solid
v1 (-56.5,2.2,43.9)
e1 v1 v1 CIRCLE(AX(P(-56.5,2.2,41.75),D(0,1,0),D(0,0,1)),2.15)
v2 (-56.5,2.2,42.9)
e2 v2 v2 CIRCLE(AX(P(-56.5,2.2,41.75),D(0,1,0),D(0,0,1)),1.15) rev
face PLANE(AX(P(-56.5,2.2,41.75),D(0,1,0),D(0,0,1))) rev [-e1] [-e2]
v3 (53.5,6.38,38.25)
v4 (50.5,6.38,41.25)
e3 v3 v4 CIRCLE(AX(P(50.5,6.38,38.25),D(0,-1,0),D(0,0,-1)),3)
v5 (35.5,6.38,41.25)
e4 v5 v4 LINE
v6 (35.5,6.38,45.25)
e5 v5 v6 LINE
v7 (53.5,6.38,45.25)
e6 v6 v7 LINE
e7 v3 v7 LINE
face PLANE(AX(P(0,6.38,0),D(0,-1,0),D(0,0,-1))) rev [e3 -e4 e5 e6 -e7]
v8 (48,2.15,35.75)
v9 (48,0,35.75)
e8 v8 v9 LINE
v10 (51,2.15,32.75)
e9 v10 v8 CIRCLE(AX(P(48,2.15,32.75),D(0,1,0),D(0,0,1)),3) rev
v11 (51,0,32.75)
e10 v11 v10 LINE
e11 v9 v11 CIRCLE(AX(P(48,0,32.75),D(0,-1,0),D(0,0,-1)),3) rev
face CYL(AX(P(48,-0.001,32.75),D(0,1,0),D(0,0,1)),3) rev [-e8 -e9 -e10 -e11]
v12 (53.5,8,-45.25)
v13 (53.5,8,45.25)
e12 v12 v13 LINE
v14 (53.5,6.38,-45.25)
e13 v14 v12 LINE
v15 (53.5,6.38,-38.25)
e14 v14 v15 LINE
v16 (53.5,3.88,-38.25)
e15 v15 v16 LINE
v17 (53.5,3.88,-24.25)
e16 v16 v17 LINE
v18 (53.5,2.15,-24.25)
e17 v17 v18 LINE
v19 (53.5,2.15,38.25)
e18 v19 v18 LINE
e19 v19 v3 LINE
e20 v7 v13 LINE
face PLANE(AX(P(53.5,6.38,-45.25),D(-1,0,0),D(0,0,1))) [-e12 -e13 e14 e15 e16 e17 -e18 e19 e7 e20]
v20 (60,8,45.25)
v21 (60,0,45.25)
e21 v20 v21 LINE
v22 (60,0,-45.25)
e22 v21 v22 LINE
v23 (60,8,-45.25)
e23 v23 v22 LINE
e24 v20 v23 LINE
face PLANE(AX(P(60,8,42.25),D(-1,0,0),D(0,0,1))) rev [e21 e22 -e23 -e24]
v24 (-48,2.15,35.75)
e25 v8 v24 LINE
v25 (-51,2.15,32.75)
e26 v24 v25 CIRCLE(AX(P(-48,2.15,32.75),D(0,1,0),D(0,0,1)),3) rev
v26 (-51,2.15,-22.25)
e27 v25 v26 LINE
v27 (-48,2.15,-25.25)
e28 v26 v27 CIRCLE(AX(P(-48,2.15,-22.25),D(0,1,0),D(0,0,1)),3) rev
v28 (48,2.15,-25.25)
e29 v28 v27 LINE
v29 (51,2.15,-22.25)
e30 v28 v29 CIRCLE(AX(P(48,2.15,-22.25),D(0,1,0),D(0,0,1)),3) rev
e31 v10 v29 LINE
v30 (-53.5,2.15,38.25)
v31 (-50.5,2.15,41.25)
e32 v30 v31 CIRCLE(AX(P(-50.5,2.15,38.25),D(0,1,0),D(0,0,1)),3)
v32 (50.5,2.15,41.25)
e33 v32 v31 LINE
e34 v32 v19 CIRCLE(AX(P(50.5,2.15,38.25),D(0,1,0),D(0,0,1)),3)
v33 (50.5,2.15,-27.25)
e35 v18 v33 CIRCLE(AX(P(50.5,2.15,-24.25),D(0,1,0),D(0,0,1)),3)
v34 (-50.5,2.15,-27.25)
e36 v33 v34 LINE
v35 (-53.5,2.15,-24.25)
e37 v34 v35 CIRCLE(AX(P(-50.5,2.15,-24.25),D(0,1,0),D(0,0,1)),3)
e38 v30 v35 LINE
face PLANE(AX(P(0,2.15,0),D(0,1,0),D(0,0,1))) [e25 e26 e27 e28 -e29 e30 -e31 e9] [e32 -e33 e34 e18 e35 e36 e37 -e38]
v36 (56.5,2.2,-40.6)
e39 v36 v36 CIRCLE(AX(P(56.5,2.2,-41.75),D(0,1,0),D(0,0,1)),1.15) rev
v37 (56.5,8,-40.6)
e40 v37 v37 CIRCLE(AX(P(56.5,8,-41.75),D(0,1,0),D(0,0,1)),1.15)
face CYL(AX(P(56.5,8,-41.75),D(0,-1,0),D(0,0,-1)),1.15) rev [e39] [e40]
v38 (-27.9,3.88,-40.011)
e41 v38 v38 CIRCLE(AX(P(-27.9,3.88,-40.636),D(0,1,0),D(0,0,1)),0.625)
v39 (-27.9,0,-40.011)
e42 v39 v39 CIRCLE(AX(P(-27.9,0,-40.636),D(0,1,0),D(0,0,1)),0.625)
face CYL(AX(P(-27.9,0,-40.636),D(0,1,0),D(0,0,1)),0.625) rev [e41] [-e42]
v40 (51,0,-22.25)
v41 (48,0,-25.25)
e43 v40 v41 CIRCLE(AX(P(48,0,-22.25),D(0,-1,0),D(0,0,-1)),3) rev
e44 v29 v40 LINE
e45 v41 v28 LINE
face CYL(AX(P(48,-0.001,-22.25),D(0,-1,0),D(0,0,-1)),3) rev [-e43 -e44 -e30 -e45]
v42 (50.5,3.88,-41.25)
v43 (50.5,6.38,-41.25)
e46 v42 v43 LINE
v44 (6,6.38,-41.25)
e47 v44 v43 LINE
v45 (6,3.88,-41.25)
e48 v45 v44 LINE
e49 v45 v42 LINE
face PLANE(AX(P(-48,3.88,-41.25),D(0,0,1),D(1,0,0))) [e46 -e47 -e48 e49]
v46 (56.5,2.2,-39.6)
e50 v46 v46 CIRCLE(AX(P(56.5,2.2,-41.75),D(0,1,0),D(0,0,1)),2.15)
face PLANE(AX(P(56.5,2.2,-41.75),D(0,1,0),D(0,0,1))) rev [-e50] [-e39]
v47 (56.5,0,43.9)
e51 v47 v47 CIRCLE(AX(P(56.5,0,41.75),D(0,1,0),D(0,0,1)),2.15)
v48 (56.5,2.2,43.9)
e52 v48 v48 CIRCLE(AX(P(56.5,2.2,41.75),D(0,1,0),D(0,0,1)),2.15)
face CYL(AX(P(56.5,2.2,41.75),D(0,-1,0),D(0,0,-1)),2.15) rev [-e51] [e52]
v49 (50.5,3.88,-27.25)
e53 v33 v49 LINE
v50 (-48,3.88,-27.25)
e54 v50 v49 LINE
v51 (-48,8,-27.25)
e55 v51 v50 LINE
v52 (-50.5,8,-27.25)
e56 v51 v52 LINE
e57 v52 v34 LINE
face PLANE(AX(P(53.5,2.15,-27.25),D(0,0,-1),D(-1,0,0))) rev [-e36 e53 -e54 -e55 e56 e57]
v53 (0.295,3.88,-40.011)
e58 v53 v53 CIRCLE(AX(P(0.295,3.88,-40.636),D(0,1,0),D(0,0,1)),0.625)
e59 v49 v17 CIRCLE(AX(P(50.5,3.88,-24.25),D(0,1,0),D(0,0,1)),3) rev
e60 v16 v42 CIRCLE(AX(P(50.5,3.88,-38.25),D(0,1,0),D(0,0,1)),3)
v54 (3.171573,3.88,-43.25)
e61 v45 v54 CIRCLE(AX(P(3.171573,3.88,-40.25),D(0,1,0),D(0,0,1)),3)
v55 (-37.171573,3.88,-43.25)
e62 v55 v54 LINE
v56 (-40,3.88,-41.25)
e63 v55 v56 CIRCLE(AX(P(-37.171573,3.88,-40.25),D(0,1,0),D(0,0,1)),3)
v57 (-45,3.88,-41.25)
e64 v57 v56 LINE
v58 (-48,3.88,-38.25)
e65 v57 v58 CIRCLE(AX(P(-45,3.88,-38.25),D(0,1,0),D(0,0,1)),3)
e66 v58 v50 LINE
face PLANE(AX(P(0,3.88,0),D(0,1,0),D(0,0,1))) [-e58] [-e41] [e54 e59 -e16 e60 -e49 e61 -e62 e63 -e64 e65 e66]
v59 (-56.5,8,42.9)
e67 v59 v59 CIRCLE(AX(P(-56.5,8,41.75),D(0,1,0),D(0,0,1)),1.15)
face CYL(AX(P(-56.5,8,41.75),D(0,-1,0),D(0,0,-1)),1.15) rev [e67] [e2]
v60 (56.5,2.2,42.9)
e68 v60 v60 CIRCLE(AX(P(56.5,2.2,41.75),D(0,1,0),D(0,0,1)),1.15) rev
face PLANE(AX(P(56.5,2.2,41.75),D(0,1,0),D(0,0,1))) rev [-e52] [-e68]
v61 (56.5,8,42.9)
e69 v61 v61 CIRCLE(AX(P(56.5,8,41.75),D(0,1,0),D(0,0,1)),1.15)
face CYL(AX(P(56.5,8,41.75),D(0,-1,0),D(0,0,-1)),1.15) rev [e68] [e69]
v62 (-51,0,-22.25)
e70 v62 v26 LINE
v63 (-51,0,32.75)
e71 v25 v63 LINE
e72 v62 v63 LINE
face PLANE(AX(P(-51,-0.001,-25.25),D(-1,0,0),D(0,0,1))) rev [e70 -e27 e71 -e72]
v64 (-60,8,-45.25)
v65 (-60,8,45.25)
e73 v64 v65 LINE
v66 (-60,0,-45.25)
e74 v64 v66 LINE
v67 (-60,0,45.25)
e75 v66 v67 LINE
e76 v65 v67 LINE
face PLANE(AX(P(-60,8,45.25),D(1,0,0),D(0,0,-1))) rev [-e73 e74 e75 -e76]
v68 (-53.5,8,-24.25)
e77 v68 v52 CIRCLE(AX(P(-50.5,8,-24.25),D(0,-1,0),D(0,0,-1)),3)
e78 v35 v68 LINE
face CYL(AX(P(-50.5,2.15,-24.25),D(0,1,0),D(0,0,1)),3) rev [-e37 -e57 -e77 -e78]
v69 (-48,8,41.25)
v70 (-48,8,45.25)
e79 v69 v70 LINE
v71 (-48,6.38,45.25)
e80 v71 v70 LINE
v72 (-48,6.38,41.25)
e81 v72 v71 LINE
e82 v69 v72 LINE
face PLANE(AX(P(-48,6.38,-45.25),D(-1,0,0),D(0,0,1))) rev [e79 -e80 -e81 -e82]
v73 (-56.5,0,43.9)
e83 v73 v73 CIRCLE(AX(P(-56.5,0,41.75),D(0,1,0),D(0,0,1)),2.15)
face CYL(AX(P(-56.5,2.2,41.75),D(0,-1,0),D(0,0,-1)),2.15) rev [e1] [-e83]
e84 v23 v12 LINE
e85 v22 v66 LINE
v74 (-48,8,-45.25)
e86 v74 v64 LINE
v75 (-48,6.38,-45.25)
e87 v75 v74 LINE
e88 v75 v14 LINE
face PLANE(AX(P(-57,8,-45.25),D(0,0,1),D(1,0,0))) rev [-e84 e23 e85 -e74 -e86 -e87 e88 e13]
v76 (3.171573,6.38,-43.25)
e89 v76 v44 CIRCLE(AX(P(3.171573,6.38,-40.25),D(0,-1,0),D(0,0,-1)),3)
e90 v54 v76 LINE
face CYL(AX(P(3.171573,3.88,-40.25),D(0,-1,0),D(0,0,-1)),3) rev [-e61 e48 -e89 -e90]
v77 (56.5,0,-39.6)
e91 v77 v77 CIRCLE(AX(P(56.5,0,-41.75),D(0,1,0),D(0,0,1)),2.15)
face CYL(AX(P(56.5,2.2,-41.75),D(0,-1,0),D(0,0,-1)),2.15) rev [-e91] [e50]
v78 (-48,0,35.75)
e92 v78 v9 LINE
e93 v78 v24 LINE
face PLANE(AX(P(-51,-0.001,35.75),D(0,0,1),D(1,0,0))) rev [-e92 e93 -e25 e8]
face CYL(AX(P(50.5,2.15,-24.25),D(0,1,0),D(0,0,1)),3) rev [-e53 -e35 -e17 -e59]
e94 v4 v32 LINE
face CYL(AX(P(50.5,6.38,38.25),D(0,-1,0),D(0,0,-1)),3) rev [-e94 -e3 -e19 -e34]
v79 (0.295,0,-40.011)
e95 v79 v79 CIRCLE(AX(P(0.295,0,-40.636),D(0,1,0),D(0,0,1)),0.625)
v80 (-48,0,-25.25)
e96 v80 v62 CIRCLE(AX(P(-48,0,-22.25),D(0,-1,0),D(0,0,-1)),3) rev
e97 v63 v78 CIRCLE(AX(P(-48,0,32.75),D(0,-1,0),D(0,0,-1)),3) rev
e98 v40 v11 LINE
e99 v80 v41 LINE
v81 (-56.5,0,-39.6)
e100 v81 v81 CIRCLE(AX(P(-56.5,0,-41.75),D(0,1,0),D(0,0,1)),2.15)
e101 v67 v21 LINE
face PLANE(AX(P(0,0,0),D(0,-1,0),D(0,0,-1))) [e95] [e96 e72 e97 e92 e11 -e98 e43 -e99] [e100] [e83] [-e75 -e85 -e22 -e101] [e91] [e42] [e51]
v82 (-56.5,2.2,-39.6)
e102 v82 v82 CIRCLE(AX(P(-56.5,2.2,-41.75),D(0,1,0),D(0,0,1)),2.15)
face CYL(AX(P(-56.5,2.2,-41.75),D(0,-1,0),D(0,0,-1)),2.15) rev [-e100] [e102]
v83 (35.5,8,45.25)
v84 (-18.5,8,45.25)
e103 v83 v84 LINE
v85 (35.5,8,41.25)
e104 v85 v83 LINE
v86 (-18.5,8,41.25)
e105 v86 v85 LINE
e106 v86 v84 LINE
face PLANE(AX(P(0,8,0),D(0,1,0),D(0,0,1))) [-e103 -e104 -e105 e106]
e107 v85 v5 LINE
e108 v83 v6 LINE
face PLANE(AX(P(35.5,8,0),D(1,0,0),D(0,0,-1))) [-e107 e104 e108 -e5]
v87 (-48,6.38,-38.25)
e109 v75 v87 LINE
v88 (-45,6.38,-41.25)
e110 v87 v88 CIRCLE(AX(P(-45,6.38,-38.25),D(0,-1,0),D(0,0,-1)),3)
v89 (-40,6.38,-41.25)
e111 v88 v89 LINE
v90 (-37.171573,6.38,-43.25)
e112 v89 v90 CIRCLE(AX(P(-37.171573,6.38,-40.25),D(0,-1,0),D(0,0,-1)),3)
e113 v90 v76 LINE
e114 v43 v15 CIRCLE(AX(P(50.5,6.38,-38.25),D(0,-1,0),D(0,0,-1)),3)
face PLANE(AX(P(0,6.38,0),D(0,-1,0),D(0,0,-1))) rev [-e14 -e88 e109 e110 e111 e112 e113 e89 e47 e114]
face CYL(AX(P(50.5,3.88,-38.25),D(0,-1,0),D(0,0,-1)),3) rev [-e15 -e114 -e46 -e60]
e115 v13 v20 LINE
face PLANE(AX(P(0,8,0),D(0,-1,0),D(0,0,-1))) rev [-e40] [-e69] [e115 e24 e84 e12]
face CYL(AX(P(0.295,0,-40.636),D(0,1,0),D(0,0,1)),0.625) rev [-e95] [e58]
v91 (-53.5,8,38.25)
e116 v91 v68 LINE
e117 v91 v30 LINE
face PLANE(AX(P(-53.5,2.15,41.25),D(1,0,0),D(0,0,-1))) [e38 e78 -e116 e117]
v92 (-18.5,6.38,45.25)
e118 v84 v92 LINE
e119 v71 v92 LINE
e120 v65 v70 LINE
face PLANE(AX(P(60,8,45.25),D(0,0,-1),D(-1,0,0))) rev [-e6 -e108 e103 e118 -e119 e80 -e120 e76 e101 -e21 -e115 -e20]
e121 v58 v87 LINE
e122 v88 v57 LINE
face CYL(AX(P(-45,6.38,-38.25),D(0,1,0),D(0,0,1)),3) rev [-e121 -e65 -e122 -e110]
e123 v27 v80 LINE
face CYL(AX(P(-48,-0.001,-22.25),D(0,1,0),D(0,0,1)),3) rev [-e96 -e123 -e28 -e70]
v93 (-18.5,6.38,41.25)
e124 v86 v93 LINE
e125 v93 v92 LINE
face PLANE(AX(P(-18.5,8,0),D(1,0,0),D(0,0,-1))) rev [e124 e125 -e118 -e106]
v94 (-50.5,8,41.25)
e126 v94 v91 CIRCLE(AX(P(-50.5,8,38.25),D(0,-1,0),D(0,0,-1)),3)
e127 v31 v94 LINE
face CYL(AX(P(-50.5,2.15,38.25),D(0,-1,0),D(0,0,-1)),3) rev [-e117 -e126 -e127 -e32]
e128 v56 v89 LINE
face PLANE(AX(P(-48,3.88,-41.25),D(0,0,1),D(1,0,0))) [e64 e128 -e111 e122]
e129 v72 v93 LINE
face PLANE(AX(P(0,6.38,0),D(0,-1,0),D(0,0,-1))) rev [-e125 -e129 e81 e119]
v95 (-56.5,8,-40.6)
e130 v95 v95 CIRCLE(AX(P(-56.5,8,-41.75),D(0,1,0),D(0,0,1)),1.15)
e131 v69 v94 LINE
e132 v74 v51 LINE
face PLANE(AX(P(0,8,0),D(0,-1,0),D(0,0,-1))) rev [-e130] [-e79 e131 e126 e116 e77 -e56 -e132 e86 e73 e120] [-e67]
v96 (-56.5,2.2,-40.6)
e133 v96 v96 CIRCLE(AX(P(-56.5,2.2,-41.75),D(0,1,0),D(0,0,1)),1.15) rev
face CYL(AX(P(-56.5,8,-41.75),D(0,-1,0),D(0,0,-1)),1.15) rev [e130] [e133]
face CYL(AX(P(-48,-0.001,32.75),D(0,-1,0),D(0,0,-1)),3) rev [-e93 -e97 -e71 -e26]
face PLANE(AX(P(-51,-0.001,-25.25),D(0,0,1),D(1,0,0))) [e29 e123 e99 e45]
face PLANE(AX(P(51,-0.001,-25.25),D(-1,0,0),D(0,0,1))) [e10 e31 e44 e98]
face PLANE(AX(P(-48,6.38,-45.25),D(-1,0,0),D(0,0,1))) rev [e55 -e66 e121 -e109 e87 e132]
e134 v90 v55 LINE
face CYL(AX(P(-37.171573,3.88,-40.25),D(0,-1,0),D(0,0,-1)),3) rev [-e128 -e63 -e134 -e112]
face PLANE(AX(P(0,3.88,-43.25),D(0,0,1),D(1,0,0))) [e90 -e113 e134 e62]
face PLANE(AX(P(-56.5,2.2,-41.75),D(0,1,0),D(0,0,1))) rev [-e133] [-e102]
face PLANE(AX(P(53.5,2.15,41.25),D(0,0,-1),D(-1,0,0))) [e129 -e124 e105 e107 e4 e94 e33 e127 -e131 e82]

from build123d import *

# Parameters (mm, degrees)
EXTRUDE_1_DEPTH        = 8
SKETCH_2_W             = 101.5
SKETCH_2_H             = 90.5
PCB_DEPTH              = 1.62
CUT_EXTRUDE_1931_REACH = 77.575
SKETCH_2_4_W           = 102
SKETCH_2_4_H           = 61
SKETCH_2_5_W           = 107
SKETCH_2_5_H           = 68.5
CUT_EXTRUDE_1995_DEPTH = 5.85
SKETCH_3_W             = 101.5
SKETCH_3_H             = 14
CUT_EXTRUDE_2361_DEPTH = 2.5
SKETCH_3_3_W           = 46
SKETCH_3_3_H           = 2
CUT_EXTRUDE_2_DEPTH    = 2.5
SKETCH_2585_R          = 2.15
CUT_EXTRUDE_2883_DEPTH = 2.2
SKETCH_3_2_R           = 1.15
CUT_EXTRUDE_2937_DEPTH = 76.574880086
FILLET_1_R             = 3
SKETCH_2_6_R           = 0.625
LED_DEPTH              = 76.574880086
PCB_START              = -1.62
SKETCH_2_7_W           = 54
SKETCH_2_7_H           = 4
PCB_2_DEPTH            = 1.62


with BuildPart() as part:
    # 草图1 → 凸台-拉伸1 (new body)
    with BuildSketch(Plane(origin=(0, 0, 0), x_dir=(1, 0, 0), z_dir=(0, 1, 0))):
        Polygon((57, 45.25), (60, 45.25), (60, 42.25), (60, -42.25), (60, -45.25), (57, -45.25), (-57, -45.25), (-60, -45.25), (-60, -42.25), (-60, 42.25), (-60, 45.25), (-57, 45.25), align=None)
    extrude(amount=EXTRUDE_1_DEPTH)

    # 草图2 → PCB (cut)
    with BuildSketch(Plane(origin=(0, 8, 0), x_dir=(1, 0, 0), z_dir=(0, 1, 0))):
        with Locations((2.75, 0)):
            Rectangle(SKETCH_2_W, SKETCH_2_H)
    extrude(amount=-PCB_DEPTH, mode=Mode.SUBTRACT)

    # 草图2<4> → Cut-Extrude 1931 (cut, up to next)
    with BuildSketch(Plane(origin=(0, 8, 0), x_dir=(1, 0, 0), z_dir=(0, 1, 0)), mode=Mode.PRIVATE) as cut_extrude_1931_sk1:
        with Locations((0, -5.25)):
            Rectangle(SKETCH_2_4_W, SKETCH_2_4_H)
    cut_extrude_1931_tool1 = extrude(cut_extrude_1931_sk1.sketch, amount=-CUT_EXTRUDE_1931_REACH, mode=Mode.PRIVATE) & part.part
    add(cut_extrude_1931_tool1.solids().sort_by_distance((0, 8, 5.25))[0], mode=Mode.SUBTRACT)

    # 草图2<5> → Cut-Extrude 1995 (cut)
    with BuildSketch(Plane(origin=(0, 8, 0), x_dir=(1, 0, 0), z_dir=(0, 1, 0))):
        with Locations((0, -7)):
            Rectangle(SKETCH_2_5_W, SKETCH_2_5_H)
    extrude(amount=-CUT_EXTRUDE_1995_DEPTH, mode=Mode.SUBTRACT)

    # Sketch 3 → Cut-Extrude 2361 (cut)
    with BuildSketch(Plane(origin=(0, 6.38, 0), x_dir=(1, 0, 0), z_dir=(0, 1, 0))):
        with Locations((2.75, 34.25)):
            Rectangle(SKETCH_3_W, SKETCH_3_H)
    extrude(amount=-CUT_EXTRUDE_2361_DEPTH, mode=Mode.SUBTRACT)

    # 草图3<3> → 穿孔焊盘切除2 (cut)
    with BuildSketch(Plane(origin=(0, 6.38, 0), x_dir=(1, 0, 0), z_dir=(0, 1, 0))):
        with Locations((-17, 42.25)):
            Rectangle(SKETCH_3_3_W, SKETCH_3_3_H)
    extrude(amount=-CUT_EXTRUDE_2_DEPTH, mode=Mode.SUBTRACT)

    # Sketch 2585 → Cut-Extrude 2883 (cut)
    with BuildSketch(Plane(origin=(0, 0, 0), x_dir=(1, 0, 0), z_dir=(0, 1, 0))):
        with Locations(Location((-56.5, -41.75, 0), (0, 0, 270))):
            Circle(SKETCH_2585_R)
        with Locations(Location((-56.5, 41.75, 0), (0, 0, 270))):
            Circle(SKETCH_2585_R)
        with Locations(Location((56.5, 41.75, 0), (0, 0, 270))):
            Circle(SKETCH_2585_R)
        with Locations(Location((56.5, -41.75, 0), (0, 0, 270))):
            Circle(SKETCH_2585_R)
    extrude(amount=CUT_EXTRUDE_2883_DEPTH, mode=Mode.SUBTRACT)

    # Sketch 3 2 → Cut-Extrude 2937 (cut, through all)
    with BuildSketch(Plane(origin=(0, 0, 0), x_dir=(1, 0, 0), z_dir=(0, 1, 0))):
        with Locations(Location((-56.5, -41.75, 0), (0, 0, 270))):
            Circle(SKETCH_3_2_R)
        with Locations(Location((-56.5, 41.75, 0), (0, 0, 270))):
            Circle(SKETCH_3_2_R)
        with Locations(Location((56.5, 41.75, 0), (0, 0, 270))):
            Circle(SKETCH_3_2_R)
        with Locations(Location((56.5, -41.75, 0), (0, 0, 270))):
            Circle(SKETCH_3_2_R)
    extrude(amount=CUT_EXTRUDE_2937_DEPTH, mode=Mode.SUBTRACT)

    # 圆角1
    # the kernel refuses this fillet: 3 mm, written as the material it adds along each edge
    with BuildSketch(Plane(origin=(-51, 2.15, -25.25), x_dir=(1, 0, 0), z_dir=(0, -1, 0)), Plane(origin=(-51, 2.15, 35.75), x_dir=(0, 0, -1), z_dir=(0, -1, 0))) as fillet_1_piece_1:
        with BuildLine():
            CenterArc((FILLET_1_R, FILLET_1_R), FILLET_1_R, 180, 90)
            Line((0, FILLET_1_R), (0, 0))
            Line((0, 0), (FILLET_1_R, 0))
        make_face()
    extrude(amount=2.15)
    with BuildSketch(Plane(origin=(-53.5, 8, -27.25), x_dir=(1, 0, 0), z_dir=(0, -1, 0))) as fillet_1_piece_2:
        with BuildLine():
            CenterArc((FILLET_1_R, FILLET_1_R), FILLET_1_R, 180, 90)
            Line((0, FILLET_1_R), (0, 0))
            Line((0, 0), (FILLET_1_R, 0))
        make_face()
    extrude(amount=5.85)
    with BuildSketch(Plane(origin=(-53.5, 8, 41.25), x_dir=(1, 0, 0), z_dir=(0, -1, 0))) as fillet_1_piece_3:
        with BuildLine():
            CenterArc((FILLET_1_R, -FILLET_1_R), FILLET_1_R, 90, 90)
            Line((0, -FILLET_1_R), (0, 0))
            Line((0, 0), (FILLET_1_R, 0))
        make_face()
    extrude(amount=5.85)
    with BuildSketch(Plane(origin=(51, 2.15, 35.75), x_dir=(0, 0, -1), z_dir=(0, -1, 0)), Plane(origin=(51, 2.15, -25.25), x_dir=(-1, 0, 0), z_dir=(0, -1, 0))) as fillet_1_piece_4:
        with BuildLine():
            CenterArc((FILLET_1_R, -FILLET_1_R), FILLET_1_R, 90, 90)
            Line((0, -FILLET_1_R), (0, 0))
            Line((0, 0), (FILLET_1_R, 0))
        make_face()
    extrude(amount=2.15)
    with BuildSketch(Plane(origin=(53.5, 6.38, 41.25), x_dir=(0, 0, -1), z_dir=(0, -1, 0))) as fillet_1_piece_5:
        with BuildLine():
            CenterArc((FILLET_1_R, -FILLET_1_R), FILLET_1_R, 90, 90)
            Line((0, -FILLET_1_R), (0, 0))
            Line((0, 0), (FILLET_1_R, 0))
        make_face()
    extrude(amount=4.23)
    with BuildSketch(Plane(origin=(53.5, 3.88, -27.25), x_dir=(0, 0, 1), z_dir=(0, -1, 0))) as fillet_1_piece_6:
        with BuildLine():
            CenterArc((FILLET_1_R, FILLET_1_R), FILLET_1_R, 180, 90)
            Line((0, FILLET_1_R), (0, 0))
            Line((0, 0), (FILLET_1_R, 0))
        make_face()
    extrude(amount=1.73)
    with BuildSketch(Plane(origin=(6, 6.38, -43.25), x_dir=(-1, 0, 0), z_dir=(0, -1, 0))) as fillet_1_piece_7:
        with BuildLine():
            CenterArc((2.828427125, -3), FILLET_1_R, 90, 70.528779366)
            Line((0, -2), (0, 0))
            Line((0, 0), (2.828427125, 0))
        make_face()
    extrude(amount=2.5)
    with BuildSketch(Plane(origin=(-40, 6.38, -43.25), x_dir=(0, 0, 1), z_dir=(0, -1, 0))) as fillet_1_piece_8:
        with BuildLine():
            CenterArc((3, -2.828427125), FILLET_1_R, 109.471220634, 70.528779366)
            Line((0, -2.828427125), (0, 0))
            Line((0, 0), (2, 0))
        make_face()
    extrude(amount=2.5)
    with BuildSketch(Plane(origin=(-48, 6.38, -41.25), x_dir=(0, 0, 1), z_dir=(0, -1, 0))) as fillet_1_piece_9:
        with BuildLine():
            CenterArc((FILLET_1_R, -FILLET_1_R), FILLET_1_R, 90, 90)
            Line((0, -FILLET_1_R), (0, 0))
            Line((0, 0), (FILLET_1_R, 0))
        make_face()
    extrude(amount=2.5)
    with BuildSketch(Plane(origin=(53.5, 6.38, -41.25), x_dir=(0, 0, 1), z_dir=(0, -1, 0))) as fillet_1_piece_10:
        with BuildLine():
            CenterArc((FILLET_1_R, FILLET_1_R), FILLET_1_R, 180, 90)
            Line((0, FILLET_1_R), (0, 0))
            Line((0, 0), (FILLET_1_R, 0))
        make_face()
    extrude(amount=2.5)

    # 草图2<6> → LED孔 (cut, through all)
    with BuildSketch(Plane(origin=(0, 8, 0), x_dir=(1, 0, 0), z_dir=(0, 1, 0))):
        with Locations(Location((0.295, 40.636, 0), (0, 0, 270))):
            Circle(SKETCH_2_6_R)
        with Locations(Location((-27.9, 40.636, 0), (0, 0, 270))):
            Circle(SKETCH_2_6_R)
    extrude(amount=-LED_DEPTH, mode=Mode.SUBTRACT)

    # 草图2<7> → PCB 2 (add)
    with BuildSketch(Plane(origin=(0, 8, 0), x_dir=(1, 0, 0), z_dir=(0, 1, 0)).offset(PCB_START)):
        with Locations((8.5, -43.25)):
            Rectangle(SKETCH_2_7_W, SKETCH_2_7_H)
    extrude(amount=PCB_2_DEPTH)


solid = part.part
